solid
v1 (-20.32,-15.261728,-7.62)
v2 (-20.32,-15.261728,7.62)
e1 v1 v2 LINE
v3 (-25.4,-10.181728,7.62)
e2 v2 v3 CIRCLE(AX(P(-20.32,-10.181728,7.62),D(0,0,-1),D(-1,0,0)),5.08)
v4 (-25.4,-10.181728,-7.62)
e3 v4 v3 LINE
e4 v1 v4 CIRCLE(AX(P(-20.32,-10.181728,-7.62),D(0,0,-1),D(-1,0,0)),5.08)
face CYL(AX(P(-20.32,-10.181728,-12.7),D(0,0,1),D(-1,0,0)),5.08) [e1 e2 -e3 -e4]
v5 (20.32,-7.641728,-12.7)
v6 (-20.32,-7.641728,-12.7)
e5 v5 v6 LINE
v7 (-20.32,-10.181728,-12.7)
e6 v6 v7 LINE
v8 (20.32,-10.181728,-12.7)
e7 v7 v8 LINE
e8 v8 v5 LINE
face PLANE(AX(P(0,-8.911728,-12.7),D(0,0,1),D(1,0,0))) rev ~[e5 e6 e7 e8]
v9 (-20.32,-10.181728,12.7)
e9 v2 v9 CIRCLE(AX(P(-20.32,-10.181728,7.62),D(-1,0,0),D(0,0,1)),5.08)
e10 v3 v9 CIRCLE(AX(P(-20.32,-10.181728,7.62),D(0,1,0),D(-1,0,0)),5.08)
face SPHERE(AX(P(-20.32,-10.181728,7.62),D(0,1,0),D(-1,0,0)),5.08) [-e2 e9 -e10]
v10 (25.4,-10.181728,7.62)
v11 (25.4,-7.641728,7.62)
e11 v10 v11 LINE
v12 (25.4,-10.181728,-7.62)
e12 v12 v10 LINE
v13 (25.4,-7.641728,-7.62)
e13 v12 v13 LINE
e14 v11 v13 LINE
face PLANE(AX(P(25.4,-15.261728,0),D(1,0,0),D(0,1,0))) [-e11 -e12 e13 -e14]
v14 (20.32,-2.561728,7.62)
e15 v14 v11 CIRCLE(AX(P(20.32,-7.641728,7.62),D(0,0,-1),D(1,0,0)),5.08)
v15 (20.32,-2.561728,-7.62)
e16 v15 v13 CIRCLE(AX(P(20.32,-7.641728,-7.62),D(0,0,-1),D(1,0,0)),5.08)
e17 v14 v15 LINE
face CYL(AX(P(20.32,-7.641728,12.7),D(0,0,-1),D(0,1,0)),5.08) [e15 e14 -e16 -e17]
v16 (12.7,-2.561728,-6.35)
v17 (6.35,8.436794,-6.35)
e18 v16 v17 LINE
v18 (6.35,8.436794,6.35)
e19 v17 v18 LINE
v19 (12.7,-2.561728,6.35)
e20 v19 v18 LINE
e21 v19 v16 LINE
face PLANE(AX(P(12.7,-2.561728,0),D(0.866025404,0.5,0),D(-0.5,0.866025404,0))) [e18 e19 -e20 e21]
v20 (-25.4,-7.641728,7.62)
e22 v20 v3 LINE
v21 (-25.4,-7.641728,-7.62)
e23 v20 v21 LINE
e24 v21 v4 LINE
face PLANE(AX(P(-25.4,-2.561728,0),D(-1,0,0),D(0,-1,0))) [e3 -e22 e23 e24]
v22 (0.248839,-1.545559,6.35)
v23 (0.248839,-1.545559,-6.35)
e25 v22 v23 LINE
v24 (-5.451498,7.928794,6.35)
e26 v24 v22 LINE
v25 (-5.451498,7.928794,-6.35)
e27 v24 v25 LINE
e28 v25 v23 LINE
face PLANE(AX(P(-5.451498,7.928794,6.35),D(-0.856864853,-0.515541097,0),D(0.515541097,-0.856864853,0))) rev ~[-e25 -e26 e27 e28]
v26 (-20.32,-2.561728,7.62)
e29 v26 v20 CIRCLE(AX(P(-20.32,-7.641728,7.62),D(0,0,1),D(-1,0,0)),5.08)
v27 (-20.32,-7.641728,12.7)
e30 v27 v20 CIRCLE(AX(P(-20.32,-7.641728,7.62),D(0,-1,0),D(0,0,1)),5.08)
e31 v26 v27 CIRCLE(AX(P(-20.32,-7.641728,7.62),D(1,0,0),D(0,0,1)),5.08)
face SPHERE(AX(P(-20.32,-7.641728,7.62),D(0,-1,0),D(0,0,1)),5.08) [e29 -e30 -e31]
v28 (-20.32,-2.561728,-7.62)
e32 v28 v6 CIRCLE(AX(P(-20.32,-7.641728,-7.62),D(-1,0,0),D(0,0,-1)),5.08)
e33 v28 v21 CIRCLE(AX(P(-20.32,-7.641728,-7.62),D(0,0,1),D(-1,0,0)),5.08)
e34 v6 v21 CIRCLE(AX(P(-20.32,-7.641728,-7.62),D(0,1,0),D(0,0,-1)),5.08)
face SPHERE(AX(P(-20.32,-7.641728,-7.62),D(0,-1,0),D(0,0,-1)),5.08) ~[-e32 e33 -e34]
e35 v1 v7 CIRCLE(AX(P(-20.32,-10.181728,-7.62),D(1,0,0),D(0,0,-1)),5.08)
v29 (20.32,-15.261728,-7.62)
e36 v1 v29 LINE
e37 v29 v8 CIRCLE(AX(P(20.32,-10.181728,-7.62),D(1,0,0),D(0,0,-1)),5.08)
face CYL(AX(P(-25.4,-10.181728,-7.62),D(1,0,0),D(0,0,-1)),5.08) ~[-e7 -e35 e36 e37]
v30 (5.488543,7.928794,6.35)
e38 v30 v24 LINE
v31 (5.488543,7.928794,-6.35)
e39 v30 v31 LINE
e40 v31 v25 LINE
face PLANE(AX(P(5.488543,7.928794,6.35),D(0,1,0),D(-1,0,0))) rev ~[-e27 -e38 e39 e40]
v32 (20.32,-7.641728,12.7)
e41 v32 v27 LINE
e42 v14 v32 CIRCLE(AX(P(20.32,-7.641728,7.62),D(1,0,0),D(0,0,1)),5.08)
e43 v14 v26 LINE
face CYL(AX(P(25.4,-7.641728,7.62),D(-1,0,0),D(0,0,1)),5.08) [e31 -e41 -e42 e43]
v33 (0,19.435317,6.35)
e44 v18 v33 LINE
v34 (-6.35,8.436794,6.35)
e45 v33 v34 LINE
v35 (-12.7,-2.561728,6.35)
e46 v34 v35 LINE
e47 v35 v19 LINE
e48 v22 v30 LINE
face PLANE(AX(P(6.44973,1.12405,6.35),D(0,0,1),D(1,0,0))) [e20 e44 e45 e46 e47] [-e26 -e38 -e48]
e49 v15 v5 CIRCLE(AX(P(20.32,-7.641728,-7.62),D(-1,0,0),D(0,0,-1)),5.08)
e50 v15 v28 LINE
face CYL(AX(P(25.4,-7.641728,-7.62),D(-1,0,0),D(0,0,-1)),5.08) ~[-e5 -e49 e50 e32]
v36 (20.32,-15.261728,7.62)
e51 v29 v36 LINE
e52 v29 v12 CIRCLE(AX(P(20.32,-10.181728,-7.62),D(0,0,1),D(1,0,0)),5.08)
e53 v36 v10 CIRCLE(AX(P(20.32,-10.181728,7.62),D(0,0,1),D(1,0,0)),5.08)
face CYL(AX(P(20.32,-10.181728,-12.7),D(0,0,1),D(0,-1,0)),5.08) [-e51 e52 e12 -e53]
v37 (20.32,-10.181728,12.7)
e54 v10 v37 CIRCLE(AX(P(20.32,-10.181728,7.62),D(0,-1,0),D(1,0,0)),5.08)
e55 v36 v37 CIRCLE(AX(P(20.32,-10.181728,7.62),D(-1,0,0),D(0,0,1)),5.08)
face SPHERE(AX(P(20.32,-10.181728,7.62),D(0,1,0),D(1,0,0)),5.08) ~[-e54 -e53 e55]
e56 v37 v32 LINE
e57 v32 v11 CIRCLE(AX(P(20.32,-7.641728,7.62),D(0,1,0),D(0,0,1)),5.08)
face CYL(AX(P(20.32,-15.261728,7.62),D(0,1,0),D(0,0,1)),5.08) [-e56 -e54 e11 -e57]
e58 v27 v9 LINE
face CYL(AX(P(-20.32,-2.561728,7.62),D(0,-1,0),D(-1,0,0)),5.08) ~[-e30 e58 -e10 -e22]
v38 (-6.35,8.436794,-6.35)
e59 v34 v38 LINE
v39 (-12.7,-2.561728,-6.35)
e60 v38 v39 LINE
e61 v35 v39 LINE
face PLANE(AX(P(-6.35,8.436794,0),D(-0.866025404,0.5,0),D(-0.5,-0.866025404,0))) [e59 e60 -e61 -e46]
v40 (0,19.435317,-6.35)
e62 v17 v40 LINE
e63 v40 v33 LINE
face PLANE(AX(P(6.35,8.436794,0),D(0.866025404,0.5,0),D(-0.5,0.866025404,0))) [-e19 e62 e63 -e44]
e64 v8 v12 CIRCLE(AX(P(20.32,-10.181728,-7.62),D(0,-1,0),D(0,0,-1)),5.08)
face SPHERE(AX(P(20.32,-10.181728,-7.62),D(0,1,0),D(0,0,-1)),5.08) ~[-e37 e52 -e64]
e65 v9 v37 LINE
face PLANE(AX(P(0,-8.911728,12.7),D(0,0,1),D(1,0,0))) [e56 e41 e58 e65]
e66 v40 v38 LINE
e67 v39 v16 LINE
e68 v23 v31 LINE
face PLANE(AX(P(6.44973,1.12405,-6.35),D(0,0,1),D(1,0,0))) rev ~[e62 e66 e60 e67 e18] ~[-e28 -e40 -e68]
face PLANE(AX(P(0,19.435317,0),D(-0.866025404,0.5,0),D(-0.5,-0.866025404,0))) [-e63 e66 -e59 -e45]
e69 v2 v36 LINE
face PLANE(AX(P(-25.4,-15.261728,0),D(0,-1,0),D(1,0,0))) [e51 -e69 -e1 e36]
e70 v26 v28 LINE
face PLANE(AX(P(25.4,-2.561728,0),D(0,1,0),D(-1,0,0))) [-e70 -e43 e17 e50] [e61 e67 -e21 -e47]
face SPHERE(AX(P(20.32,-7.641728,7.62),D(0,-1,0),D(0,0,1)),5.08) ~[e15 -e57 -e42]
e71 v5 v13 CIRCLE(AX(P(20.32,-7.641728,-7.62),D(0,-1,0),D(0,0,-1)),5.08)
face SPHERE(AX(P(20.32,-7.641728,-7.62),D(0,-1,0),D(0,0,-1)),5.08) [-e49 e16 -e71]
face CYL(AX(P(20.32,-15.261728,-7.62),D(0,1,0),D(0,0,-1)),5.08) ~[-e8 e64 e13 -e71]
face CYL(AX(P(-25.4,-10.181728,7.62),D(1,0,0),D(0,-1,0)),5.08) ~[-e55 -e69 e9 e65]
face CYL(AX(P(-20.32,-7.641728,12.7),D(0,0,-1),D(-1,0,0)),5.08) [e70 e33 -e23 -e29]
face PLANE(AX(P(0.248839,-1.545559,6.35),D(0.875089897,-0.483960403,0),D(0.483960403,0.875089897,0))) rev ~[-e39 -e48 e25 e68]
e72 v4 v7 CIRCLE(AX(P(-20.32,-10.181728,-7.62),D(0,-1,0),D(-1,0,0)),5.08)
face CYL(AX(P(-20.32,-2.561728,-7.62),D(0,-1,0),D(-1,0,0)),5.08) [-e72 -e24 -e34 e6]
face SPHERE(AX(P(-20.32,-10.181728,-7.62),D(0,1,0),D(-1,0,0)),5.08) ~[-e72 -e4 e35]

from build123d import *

# Parameters (mm, degrees)
F1_DEPTH = 12.7
F2_DEPTH = 6.35
F4_DEPTH = 19.051
F5_R     = 5.08


# Not quite as in the source:
# - a feature names something its author has since deleted; it is built from what else it names


with BuildPart() as f1:
    # F0 (on Top) → F1 (new body, symmetric)
    with BuildSketch(Plane.XY):
        Polygon((0.2673684239, -2.5617282353), (-12.7, -2.5617282353), (-25.4, -2.5617282353), (-25.4, -15.2617282353), (25.4, -15.2617282353), (25.4, -2.5617282353), (12.7, -2.5617282353), align=None)
    extrude(amount=F1_DEPTH, both=True)

    # F0 (on Top) → F2 (join, symmetric)
    with BuildSketch(Plane.XY):
        Polygon((6.35, 8.4367943928), (0.2673684239, -2.5617282353), (12.7, -2.5617282353), align=None)
        Polygon((-6.35, 8.4367943928), (-12.7, -2.5617282353), (0.2673684239, -2.5617282353), align=None)
        Polygon((0, 19.4353170208), (-6.35, 8.4367943928), (6.35, 8.4367943928), align=None)
        Polygon((-6.35, 8.4367943928), (0.2673684239, -2.5617282353), (6.35, 8.4367943928), align=None)
    extrude(amount=F2_DEPTH, both=True)

    # F3 (on face) → F4 (cut, through all)
    with BuildSketch(Plane.XY.offset(6.35)):
        Polygon((5.4885434949, 7.9287943928), (-5.4514978916, 7.9287943928), (0.2488394649, -1.5455593664), align=None)
    extrude(amount=-F4_DEPTH, mode=Mode.SUBTRACT)

    # F5
    f5_edges = [f1.edges().sort_by_distance(p)[0] for p in [
        (-25.4, -8.911728, 12.7),
        (-25.4, -8.911728, -12.7),
        (25.4, -8.911728, -12.7),
        (25.4, -8.911728, 12.7),
        (-25.4, -15.261728, 0),
        (0, -15.261728, -12.7),
        (25.4, -15.261728, 0),
        (0, -15.261728, 12.7),
        (0, -2.561728, 12.7),
        (0, -2.561728, -12.7),
        (25.4, -2.561728, 0),
        (-25.4, -2.561728, 0),
    ]]
    fillet(f5_edges, radius=F5_R)


solid = f1.part
